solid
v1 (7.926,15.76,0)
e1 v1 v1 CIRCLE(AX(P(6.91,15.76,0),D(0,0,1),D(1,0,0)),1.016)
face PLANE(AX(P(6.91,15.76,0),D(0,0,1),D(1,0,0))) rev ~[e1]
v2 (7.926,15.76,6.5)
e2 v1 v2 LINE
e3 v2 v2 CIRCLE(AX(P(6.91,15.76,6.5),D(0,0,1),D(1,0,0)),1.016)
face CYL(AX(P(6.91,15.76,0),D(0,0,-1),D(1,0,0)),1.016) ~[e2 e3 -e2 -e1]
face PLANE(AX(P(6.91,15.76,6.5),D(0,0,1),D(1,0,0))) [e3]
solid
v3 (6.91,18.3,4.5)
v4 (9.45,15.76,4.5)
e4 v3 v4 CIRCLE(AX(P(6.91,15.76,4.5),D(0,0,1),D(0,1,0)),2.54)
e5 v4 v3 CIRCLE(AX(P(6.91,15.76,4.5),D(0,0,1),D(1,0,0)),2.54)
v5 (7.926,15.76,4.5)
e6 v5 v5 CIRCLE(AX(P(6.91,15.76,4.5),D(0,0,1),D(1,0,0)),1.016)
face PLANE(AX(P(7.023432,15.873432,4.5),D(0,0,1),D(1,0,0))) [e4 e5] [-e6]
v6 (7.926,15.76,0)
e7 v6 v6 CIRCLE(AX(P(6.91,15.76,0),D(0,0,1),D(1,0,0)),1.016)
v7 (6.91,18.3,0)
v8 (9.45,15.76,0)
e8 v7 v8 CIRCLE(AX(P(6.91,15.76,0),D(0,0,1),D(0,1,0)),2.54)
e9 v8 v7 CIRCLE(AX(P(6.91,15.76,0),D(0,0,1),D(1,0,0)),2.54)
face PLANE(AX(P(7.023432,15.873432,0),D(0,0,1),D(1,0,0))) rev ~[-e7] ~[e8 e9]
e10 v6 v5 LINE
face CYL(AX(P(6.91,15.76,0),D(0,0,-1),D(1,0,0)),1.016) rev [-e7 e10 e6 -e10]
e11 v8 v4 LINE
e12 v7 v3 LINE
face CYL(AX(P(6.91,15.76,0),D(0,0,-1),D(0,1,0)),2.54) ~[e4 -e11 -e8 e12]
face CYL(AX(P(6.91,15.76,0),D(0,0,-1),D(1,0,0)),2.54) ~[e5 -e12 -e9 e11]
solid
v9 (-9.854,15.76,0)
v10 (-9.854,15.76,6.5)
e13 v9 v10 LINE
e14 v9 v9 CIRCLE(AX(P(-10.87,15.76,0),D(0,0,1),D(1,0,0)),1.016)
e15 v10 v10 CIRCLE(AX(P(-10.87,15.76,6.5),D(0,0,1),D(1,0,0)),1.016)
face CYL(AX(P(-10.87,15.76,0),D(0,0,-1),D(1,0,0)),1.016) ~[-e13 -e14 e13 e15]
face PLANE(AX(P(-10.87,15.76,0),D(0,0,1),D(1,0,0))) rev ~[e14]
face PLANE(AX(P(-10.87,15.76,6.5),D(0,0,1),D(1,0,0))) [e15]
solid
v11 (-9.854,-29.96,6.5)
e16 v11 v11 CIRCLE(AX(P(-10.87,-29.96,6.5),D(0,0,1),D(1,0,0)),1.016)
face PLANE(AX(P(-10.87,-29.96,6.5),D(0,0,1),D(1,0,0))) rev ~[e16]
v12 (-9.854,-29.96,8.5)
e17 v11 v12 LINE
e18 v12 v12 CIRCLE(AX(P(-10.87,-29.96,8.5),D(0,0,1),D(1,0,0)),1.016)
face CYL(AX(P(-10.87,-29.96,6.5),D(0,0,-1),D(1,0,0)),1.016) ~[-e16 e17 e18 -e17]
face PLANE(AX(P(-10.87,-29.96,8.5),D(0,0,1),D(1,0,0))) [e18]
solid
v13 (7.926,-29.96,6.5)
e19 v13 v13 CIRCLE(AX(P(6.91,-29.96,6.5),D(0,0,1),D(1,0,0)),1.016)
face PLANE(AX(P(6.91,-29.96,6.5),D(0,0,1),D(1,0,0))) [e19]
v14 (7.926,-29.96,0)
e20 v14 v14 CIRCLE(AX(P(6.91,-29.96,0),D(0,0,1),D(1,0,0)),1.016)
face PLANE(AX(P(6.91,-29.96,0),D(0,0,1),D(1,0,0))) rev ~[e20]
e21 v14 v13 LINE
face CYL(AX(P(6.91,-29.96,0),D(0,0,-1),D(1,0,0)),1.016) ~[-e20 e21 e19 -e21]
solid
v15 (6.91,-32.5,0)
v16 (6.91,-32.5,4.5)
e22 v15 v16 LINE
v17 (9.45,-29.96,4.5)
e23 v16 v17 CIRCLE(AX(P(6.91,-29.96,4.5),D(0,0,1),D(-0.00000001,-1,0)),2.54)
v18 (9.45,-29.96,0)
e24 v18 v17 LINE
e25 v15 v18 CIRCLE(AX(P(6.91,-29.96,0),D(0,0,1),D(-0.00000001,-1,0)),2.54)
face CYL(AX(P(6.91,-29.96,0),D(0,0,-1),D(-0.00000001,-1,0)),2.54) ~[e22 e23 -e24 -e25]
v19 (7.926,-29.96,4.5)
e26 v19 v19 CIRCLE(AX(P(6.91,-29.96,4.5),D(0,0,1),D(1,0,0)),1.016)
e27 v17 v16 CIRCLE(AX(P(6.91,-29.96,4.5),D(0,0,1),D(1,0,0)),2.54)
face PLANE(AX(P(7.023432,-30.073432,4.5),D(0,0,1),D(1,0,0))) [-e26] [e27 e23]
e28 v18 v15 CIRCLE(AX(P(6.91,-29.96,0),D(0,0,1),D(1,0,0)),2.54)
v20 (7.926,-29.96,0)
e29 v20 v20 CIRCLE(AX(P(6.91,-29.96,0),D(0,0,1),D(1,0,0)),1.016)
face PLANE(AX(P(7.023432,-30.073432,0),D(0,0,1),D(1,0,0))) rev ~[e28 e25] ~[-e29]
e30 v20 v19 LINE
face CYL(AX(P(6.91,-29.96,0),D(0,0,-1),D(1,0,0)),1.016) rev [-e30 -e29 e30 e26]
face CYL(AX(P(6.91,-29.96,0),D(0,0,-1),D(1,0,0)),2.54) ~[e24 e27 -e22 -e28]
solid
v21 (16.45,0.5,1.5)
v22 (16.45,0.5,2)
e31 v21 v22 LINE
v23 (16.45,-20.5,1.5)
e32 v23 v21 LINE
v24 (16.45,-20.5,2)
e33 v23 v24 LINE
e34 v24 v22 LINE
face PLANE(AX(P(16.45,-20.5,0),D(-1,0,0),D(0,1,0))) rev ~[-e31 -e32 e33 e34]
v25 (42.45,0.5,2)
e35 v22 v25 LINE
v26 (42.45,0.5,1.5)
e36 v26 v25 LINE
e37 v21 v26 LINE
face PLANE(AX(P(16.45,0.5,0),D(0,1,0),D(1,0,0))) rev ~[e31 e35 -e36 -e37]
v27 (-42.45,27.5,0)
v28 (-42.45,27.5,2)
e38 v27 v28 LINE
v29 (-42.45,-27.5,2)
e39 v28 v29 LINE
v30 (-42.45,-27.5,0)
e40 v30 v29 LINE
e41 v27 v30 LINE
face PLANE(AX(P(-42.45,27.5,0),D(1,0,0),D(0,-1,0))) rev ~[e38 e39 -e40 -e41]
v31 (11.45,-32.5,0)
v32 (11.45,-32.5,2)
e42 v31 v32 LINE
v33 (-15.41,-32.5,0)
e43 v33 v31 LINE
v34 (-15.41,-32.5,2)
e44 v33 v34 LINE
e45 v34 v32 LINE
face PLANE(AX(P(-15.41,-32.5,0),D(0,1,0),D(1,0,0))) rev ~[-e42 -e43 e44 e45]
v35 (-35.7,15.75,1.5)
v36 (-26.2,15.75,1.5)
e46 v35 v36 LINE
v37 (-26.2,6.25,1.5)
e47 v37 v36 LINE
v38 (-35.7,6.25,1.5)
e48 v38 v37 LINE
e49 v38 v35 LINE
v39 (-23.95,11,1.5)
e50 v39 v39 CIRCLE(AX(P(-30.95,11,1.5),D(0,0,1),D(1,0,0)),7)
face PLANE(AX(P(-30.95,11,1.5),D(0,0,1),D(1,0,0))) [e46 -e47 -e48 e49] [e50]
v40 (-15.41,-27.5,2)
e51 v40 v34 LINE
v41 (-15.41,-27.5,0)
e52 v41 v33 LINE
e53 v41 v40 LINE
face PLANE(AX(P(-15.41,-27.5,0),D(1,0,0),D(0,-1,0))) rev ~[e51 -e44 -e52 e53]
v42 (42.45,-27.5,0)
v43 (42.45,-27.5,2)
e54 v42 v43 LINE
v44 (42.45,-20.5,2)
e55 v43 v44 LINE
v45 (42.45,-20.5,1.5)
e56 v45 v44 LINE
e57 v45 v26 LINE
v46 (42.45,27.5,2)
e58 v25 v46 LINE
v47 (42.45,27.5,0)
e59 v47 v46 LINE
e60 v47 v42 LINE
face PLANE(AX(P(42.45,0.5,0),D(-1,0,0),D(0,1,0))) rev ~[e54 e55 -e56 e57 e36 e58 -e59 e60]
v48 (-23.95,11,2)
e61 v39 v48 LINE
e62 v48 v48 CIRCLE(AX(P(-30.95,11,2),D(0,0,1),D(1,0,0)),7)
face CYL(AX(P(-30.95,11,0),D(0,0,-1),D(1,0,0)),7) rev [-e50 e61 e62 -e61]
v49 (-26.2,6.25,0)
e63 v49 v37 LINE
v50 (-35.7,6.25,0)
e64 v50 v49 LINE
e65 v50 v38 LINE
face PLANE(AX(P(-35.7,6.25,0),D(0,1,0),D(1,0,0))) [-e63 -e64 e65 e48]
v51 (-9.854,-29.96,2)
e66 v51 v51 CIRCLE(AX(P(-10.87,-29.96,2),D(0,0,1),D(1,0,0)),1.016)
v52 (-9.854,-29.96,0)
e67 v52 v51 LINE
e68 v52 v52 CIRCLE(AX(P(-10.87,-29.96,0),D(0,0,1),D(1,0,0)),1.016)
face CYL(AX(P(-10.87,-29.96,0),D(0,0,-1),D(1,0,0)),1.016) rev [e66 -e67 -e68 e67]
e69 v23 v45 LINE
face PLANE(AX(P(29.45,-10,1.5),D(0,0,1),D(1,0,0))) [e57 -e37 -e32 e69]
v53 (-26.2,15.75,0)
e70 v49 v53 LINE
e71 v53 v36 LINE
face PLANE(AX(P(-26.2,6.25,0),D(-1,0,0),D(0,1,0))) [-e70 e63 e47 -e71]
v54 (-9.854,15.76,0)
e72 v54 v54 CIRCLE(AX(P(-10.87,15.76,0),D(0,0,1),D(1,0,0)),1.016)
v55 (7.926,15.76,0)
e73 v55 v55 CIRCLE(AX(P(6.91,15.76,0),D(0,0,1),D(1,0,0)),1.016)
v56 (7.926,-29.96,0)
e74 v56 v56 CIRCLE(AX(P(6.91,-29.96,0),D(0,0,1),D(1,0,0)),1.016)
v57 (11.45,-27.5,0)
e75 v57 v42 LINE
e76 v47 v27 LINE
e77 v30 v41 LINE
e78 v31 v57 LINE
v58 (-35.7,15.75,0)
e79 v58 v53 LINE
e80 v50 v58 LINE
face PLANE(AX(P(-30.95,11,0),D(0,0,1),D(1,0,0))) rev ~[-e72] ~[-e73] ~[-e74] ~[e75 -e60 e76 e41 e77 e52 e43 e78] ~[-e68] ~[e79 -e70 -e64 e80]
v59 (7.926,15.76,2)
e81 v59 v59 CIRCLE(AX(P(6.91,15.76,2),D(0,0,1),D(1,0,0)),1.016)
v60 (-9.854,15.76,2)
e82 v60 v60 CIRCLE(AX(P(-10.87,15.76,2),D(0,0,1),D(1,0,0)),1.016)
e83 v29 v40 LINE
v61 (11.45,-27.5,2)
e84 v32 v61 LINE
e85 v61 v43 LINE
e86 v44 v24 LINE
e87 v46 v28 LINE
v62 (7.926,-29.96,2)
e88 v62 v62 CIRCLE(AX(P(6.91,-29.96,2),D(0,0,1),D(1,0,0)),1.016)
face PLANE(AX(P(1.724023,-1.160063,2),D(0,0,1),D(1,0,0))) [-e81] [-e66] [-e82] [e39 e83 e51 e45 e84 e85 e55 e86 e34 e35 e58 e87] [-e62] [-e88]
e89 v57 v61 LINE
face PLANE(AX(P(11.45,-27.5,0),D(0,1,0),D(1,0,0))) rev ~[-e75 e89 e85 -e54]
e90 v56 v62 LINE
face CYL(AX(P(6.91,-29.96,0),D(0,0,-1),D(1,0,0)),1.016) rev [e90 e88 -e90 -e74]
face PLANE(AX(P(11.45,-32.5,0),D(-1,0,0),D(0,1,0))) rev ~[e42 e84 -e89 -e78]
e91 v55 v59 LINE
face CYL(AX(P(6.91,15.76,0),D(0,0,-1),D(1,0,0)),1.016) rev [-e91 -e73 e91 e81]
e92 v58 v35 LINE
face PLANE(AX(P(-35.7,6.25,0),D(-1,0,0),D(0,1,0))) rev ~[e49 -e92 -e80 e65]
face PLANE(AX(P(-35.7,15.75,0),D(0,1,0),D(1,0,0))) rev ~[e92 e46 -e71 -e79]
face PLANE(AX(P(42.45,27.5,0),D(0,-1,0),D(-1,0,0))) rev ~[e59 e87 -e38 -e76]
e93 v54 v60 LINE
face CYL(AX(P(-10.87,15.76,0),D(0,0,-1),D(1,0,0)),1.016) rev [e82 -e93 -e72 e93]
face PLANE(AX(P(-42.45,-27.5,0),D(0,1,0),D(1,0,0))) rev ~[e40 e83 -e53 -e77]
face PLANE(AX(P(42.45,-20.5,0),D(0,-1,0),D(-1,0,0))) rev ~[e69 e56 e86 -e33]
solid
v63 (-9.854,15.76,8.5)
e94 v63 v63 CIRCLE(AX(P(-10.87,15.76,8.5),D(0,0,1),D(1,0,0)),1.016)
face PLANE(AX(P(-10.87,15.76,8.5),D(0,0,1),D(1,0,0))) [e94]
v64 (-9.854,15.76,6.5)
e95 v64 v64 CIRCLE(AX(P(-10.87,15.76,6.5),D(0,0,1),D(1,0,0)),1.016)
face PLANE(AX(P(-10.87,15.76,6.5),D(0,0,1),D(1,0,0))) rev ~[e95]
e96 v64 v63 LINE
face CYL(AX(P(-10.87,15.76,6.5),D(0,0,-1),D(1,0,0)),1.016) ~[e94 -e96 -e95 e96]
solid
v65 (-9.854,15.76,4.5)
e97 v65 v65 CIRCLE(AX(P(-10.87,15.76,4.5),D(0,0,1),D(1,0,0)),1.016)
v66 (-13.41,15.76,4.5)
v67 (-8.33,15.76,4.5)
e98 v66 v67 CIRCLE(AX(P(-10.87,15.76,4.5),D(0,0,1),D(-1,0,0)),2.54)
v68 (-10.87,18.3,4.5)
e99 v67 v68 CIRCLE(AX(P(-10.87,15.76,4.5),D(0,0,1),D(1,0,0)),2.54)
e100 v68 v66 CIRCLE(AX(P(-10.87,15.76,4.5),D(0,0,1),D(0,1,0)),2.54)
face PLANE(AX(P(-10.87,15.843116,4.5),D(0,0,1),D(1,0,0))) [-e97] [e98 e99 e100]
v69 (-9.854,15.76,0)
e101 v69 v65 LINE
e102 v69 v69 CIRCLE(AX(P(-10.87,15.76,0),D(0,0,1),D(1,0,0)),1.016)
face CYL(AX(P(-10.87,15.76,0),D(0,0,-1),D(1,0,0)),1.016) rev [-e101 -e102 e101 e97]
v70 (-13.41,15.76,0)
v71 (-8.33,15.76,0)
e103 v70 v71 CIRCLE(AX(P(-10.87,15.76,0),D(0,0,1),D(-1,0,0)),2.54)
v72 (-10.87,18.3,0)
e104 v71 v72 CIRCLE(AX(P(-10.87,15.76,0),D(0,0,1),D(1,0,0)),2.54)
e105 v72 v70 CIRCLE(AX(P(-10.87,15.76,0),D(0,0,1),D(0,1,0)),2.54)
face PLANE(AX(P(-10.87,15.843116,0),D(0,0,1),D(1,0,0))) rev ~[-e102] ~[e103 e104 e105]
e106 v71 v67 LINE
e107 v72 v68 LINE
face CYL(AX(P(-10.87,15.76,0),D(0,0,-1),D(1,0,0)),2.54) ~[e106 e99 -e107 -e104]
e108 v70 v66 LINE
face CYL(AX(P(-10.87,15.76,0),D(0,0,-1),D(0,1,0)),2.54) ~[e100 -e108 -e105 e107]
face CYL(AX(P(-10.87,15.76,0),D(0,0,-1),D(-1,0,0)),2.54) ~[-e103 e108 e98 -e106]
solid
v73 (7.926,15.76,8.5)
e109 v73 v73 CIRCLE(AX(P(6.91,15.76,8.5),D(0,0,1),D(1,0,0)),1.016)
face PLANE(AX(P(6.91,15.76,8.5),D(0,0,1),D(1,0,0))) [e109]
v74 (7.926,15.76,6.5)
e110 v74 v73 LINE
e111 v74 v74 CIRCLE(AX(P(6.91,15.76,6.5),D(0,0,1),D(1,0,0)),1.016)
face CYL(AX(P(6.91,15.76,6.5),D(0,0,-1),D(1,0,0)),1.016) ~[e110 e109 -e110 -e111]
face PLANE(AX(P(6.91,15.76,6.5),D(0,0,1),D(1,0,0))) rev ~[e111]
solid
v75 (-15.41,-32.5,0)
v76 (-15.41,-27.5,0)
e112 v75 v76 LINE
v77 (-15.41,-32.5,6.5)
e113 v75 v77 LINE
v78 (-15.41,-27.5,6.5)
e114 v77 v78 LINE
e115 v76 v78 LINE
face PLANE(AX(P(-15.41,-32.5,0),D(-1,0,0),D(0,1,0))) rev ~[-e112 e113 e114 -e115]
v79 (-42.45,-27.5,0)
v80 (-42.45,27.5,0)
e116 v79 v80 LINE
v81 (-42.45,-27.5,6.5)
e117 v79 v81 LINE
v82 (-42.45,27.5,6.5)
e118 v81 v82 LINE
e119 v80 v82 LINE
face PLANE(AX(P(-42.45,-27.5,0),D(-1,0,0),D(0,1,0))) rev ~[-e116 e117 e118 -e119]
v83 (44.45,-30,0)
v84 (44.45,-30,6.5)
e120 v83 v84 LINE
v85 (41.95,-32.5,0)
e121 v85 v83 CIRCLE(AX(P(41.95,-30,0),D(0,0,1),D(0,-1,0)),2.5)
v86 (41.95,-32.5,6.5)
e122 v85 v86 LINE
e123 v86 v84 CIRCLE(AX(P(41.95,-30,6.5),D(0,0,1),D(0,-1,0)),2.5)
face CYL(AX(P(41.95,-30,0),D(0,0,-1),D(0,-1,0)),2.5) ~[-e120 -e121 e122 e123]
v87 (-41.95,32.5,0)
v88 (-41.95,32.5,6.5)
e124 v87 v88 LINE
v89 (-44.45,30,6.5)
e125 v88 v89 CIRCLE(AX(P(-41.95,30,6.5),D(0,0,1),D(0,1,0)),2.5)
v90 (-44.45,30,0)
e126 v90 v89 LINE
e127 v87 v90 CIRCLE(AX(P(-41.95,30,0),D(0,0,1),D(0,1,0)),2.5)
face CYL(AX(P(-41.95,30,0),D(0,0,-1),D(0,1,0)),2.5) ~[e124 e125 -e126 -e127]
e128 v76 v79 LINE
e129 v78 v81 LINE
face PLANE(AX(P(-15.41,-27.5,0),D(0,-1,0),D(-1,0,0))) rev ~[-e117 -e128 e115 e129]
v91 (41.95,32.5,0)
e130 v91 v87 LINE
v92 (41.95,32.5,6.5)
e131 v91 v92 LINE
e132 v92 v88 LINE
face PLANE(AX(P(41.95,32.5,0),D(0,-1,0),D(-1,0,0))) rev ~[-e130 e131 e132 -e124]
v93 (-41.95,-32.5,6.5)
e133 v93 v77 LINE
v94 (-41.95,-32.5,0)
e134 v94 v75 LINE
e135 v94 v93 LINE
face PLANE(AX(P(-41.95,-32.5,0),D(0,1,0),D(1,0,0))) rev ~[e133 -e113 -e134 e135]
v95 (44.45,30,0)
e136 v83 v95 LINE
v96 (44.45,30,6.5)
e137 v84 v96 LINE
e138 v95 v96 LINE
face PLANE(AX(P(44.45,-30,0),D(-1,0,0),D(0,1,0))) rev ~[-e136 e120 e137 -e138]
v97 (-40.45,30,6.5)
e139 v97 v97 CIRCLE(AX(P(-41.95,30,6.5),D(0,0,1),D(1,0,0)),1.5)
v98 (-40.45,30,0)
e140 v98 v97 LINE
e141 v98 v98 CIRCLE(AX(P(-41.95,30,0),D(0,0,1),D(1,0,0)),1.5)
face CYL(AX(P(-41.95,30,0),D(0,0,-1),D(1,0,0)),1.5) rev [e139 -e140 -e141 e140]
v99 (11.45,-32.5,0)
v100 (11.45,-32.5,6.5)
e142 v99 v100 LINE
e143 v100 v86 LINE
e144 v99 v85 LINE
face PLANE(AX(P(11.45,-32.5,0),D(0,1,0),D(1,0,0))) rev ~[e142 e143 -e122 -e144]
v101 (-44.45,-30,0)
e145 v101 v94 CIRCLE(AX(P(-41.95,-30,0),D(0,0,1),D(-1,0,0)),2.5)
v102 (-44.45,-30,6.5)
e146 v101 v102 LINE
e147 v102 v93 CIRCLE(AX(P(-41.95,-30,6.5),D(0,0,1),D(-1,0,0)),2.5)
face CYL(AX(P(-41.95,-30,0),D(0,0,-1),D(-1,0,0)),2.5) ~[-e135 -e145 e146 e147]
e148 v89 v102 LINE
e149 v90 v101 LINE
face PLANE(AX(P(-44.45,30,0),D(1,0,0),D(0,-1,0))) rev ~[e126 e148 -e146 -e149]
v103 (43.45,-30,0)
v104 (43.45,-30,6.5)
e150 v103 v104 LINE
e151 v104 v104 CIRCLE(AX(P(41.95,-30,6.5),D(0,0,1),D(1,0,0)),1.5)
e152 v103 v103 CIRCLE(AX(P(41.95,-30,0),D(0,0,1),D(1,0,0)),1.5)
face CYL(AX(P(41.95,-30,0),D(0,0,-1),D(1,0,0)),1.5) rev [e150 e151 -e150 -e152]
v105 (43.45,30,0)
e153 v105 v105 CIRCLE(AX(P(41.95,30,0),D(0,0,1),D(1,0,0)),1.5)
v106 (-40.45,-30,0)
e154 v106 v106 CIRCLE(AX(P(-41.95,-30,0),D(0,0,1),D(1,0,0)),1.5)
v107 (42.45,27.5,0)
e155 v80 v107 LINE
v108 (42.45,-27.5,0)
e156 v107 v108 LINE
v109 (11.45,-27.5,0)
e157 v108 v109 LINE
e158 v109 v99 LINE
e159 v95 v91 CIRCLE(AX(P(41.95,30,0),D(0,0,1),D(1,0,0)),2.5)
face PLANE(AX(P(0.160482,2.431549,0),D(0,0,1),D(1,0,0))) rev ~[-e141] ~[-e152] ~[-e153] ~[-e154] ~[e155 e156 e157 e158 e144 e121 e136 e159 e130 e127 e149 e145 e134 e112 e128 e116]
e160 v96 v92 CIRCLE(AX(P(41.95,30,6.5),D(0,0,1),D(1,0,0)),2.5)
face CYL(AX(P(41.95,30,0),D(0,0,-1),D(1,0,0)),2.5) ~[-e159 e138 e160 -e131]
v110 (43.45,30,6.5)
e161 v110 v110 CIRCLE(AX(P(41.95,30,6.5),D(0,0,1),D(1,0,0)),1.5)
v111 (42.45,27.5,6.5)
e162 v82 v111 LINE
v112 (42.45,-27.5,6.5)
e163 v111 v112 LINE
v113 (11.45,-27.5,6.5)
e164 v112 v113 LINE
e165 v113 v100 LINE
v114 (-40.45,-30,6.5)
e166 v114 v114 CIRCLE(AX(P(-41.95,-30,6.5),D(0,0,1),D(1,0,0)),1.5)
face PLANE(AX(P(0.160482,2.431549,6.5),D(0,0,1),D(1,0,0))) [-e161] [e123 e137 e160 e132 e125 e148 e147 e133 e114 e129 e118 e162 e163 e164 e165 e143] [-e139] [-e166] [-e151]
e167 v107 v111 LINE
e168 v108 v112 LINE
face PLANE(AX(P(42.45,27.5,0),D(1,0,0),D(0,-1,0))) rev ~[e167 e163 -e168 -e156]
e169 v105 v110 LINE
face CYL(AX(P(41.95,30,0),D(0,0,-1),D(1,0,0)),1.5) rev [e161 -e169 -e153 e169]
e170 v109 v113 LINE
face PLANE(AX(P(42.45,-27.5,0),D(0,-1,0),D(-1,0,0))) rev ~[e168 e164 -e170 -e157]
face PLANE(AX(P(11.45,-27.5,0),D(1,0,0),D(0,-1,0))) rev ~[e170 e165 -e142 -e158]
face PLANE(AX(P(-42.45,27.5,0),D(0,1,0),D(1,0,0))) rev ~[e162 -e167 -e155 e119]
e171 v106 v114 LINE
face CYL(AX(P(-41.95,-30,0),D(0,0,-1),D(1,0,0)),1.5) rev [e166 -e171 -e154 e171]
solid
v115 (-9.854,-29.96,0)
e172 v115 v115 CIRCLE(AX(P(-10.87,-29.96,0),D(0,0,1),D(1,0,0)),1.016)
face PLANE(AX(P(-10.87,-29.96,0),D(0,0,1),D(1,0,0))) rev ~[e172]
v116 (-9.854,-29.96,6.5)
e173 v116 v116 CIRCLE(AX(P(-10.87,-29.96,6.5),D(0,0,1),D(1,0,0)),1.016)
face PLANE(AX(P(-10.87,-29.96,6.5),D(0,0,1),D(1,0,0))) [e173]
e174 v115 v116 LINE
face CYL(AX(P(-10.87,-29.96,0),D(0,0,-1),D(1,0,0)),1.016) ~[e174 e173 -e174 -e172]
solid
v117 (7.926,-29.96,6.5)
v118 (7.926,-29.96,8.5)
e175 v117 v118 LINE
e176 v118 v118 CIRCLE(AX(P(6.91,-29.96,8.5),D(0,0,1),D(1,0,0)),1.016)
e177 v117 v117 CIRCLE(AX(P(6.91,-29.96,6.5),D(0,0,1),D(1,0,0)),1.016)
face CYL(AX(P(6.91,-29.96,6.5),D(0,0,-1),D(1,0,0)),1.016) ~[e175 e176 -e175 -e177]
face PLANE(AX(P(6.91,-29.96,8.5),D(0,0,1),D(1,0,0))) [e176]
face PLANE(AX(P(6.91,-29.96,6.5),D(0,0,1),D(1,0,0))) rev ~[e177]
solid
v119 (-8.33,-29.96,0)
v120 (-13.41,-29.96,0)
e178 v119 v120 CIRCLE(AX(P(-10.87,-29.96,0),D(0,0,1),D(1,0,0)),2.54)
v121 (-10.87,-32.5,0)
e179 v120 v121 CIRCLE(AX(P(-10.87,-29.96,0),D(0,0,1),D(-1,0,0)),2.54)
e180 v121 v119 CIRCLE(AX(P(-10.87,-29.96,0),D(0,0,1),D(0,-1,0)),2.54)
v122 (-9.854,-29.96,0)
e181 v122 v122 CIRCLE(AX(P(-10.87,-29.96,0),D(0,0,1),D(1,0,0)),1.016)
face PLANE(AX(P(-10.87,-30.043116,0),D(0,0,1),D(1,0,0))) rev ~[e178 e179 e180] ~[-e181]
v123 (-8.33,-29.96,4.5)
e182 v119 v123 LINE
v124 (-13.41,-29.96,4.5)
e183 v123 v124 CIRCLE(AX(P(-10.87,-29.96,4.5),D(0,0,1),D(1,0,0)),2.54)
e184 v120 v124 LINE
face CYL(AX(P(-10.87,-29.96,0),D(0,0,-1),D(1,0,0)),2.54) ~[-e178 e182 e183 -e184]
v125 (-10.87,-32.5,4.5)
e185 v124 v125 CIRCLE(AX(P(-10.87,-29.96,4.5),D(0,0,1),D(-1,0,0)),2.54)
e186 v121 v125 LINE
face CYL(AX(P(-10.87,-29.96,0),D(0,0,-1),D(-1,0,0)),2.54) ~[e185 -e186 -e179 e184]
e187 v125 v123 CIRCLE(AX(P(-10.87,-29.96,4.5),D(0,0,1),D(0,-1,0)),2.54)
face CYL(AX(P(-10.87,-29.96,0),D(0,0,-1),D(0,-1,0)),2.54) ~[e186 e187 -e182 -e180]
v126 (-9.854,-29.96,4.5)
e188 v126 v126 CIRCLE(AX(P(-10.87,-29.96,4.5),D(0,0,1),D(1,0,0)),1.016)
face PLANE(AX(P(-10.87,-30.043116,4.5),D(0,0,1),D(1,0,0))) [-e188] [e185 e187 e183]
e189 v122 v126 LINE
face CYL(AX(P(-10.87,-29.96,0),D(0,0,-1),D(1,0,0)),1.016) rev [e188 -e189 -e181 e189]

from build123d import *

# Parameters (mm, degrees)
F0_R      = 1.016
F1_DEPTH  = 6.5
F0_R_2    = 1.5
F0_R_3    = 7
F1_FACE_R = 1.016
F2_DEPTH  = 2
F0_W      = 9.5
F0_H      = 9.5
F0_W_2    = 26
F0_H_2    = 21
F3_DEPTH  = 1.5
F4_DEPTH  = 4.5


with BuildPart() as f1:
    # F0 (on Top) → F1 (new body)
    with BuildSketch(Plane.XY):
        with Locations((-10.87, -29.96)):
            Circle(F0_R)
    extrude(amount=F1_DEPTH)


with BuildPart() as f1b:
    # F0 (on Top) → F1, piece 2 (new body)
    with BuildSketch(Plane.XY):
        with Locations((6.91, -29.96)):
            Circle(F0_R)
    extrude(amount=F1_DEPTH)


with BuildPart() as f1c:
    # F0 (on Top) → F1, piece 3 (new body)
    with BuildSketch(Plane.XY):
        with Locations((-10.87, 15.76)):
            Circle(F0_R)
    extrude(amount=F1_DEPTH)


with BuildPart() as f1d:
    # F0 (on Top) → F1, piece 4 (new body)
    with BuildSketch(Plane.XY):
        with Locations((6.91, 15.76)):
            Circle(F0_R)
    extrude(amount=F1_DEPTH)


with BuildPart() as f1e:
    # F0 (on Top) → F1, piece 5 (new body)
    with BuildSketch(Plane.XY):
        with BuildLine():
            Line((-42.45, 27.5), (42.45, 27.5))
            Line((42.45, 27.5), (42.45, 0.5))
            Line((42.45, 0.5), (42.45, -20.5))
            Line((42.45, -20.5), (42.45, -27.5))
            Line((42.45, -27.5), (11.45, -27.5))
            Line((11.45, -27.5), (11.45, -32.5))
            Line((11.45, -32.5), (41.95, -32.5))
            ThreePointArc((41.95, -32.5), (43.717766953, -31.767766953), (44.45, -30))
            Line((44.45, -30), (44.45, -27.5))
            Line((44.45, -27.5), (44.45, 27.5))
            Line((44.45, 27.5), (44.45, 30))
            ThreePointArc((44.45, 30), (43.717766953, 31.767766953), (41.95, 32.5))
            Line((41.95, 32.5), (-41.95, 32.5))
            ThreePointArc((-41.95, 32.5), (-43.717766953, 31.767766953), (-44.45, 30))
            Line((-44.45, 30), (-44.45, 27.5))
            Line((-44.45, 27.5), (-44.45, -27.5))
            Line((-44.45, -27.5), (-44.45, -30))
            ThreePointArc((-44.45, -30), (-43.717766953, -31.767766953), (-41.95, -32.5))
            Line((-41.95, -32.5), (-15.41, -32.5))
            Line((-15.41, -32.5), (-15.41, -27.5))
            Line((-15.41, -27.5), (-42.45, -27.5))
            Line((-42.45, -27.5), (-42.45, 27.5))
        make_face()
        with Locations((-41.95, -30)):
            Circle(F0_R_2, mode=Mode.SUBTRACT)
        with Locations((41.95, -30)):
            Circle(F0_R_2, mode=Mode.SUBTRACT)
        with Locations((-41.95, 30)):
            Circle(F0_R_2, mode=Mode.SUBTRACT)
        with Locations((41.95, 30)):
            Circle(F0_R_2, mode=Mode.SUBTRACT)
    extrude(amount=F1_DEPTH)


with BuildPart() as f2:
    # F0 (on Top) + F1_face (on face) → F2 (new body)
    with BuildSketch(Plane.XY):
        Polygon((42.45, 0.5), (42.45, 27.5), (-42.45, 27.5), (-42.45, -27.5), (-15.41, -27.5), (-15.41, -32.5), (-13.41, -32.5), (-13.41, -29.96), (-13.41, 15.76), (-13.41, 18.3), (-10.87, 18.3), (6.9099999988, 18.3), (9.45, 18.3), (9.45, 15.76), (9.45, -29.96), (9.45, -32.5), (11.45, -32.5), (11.45, -27.5), (42.45, -27.5), (42.45, -20.5), (16.45, -20.5), (16.45, 0.5), align=None)
        with Locations((-30.95, 11)):
            Circle(F0_R_3, mode=Mode.SUBTRACT)
        with BuildLine():
            Line((-13.41, -29.96), (-13.41, -32.5))
            Line((-13.41, -32.5), (-10.87, -32.5))
            ThreePointArc((-10.87, -32.5), (-12.6660512242, -31.7560512242), (-13.41, -29.96))
        make_face()
        with BuildLine():
            ThreePointArc((-8.33, -29.96), (-9.0739487758, -31.7560512242), (-10.87, -32.5))
            Line((-10.87, -32.5), (6.9099999741, -32.5))
            ThreePointArc((6.9099999741, -32.5), (5.1139487849, -28.1639487666), (9.45, -29.96))
            Line((9.45, -29.96), (9.45, 15.76))
            ThreePointArc((9.45, 15.76), (5.1139487762, 13.9639487754), (6.9099999988, 18.3))
            Line((6.9099999988, 18.3), (-10.87, 18.3))
            ThreePointArc((-10.87, 18.3), (-9.0739487758, 17.5560512242), (-8.33, 15.76))
            ThreePointArc((-8.33, 15.76), (-10.87, 13.22), (-13.41, 15.76))
            Line((-13.41, 15.76), (-13.41, -29.96))
            ThreePointArc((-13.41, -29.96), (-10.87, -27.42), (-8.33, -29.96))
        make_face()
        with BuildLine():
            Line((6.9099999741, -32.5), (9.45, -32.5))
            Line((9.45, -32.5), (9.45, -29.96))
            ThreePointArc((9.45, -29.96), (8.7060512151, -31.7560512334), (6.9099999741, -32.5))
        make_face()
        with BuildLine():
            ThreePointArc((6.9099999988, 18.3), (8.7060512238, 17.5560512246), (9.45, 15.76))
            Line((9.45, 15.76), (9.45, 18.3))
            Line((9.45, 18.3), (6.9099999988, 18.3))
        make_face()
        with BuildLine():
            Line((-13.41, 18.3), (-13.41, 15.76))
            ThreePointArc((-13.41, 15.76), (-12.6660512242, 17.5560512242), (-10.87, 18.3))
            Line((-10.87, 18.3), (-13.41, 18.3))
        make_face()
        with BuildLine():
            ThreePointArc((6.9099999988, 18.3), (5.1139487762, 13.9639487754), (9.45, 15.76))
            ThreePointArc((9.45, 15.76), (8.7060512238, 17.5560512246), (6.9099999988, 18.3))
        make_face()
        with Locations((6.91, 15.76)):
            Circle(F0_R, mode=Mode.SUBTRACT)
        with BuildLine():
            ThreePointArc((-13.41, -29.96), (-12.6660512242, -31.7560512242), (-10.87, -32.5))
            ThreePointArc((-10.87, -32.5), (-9.0739487758, -31.7560512242), (-8.33, -29.96))
            ThreePointArc((-8.33, -29.96), (-10.87, -27.42), (-13.41, -29.96))
        make_face()
        with Locations((-10.87, -29.96)):
            Circle(F0_R, mode=Mode.SUBTRACT)
        with BuildLine():
            ThreePointArc((9.45, -29.96), (5.1139487849, -28.1639487666), (6.9099999741, -32.5))
            ThreePointArc((6.9099999741, -32.5), (8.7060512151, -31.7560512334), (9.45, -29.96))
        make_face()
        with Locations((6.91, -29.96)):
            Circle(F0_R, mode=Mode.SUBTRACT)
        with BuildLine():
            ThreePointArc((-10.87, 18.3), (-12.6660512242, 17.5560512242), (-13.41, 15.76))
            ThreePointArc((-13.41, 15.76), (-10.87, 13.22), (-8.33, 15.76))
            ThreePointArc((-8.33, 15.76), (-9.0739487758, 17.5560512242), (-10.87, 18.3))
        make_face()
        with Locations((-10.87, 15.76)):
            Circle(F0_R, mode=Mode.SUBTRACT)
    with BuildSketch(Plane(origin=(-10.87, -29.96, 6.5), x_dir=(1, 0, 0), z_dir=(0, 0, 1))):
        Circle(F1_FACE_R)
        with Locations((17.78, 0)):
            Circle(F1_FACE_R)
        with Locations((0, 45.72)):
            Circle(F1_FACE_R)
        with Locations((17.78, 45.72)):
            Circle(F1_FACE_R)
    extrude(amount=F2_DEPTH)

    # F0 (on Top) → F3 (join)
    with BuildSketch(Plane.XY):
        with Locations((-30.95, 11)):
            Circle(F0_R_3)
        with Locations((-30.95, 11)):
            Rectangle(F0_W, F0_H, mode=Mode.SUBTRACT)
        with Locations((29.45, -10)):
            Rectangle(F0_W_2, F0_H_2)
    extrude(amount=F3_DEPTH)


with BuildPart() as f4:
    # F0 (on Top) → F4 (new body)
    with BuildSketch(Plane.XY):
        with BuildLine():
            ThreePointArc((-10.87, 18.3), (-12.6660512242, 17.5560512242), (-13.41, 15.76))
            ThreePointArc((-13.41, 15.76), (-10.87, 13.22), (-8.33, 15.76))
            ThreePointArc((-8.33, 15.76), (-9.0739487758, 17.5560512242), (-10.87, 18.3))
        make_face()
        with Locations((-10.87, 15.76)):
            Circle(F0_R, mode=Mode.SUBTRACT)
    extrude(amount=F4_DEPTH)


with BuildPart() as f4b:
    # F0 (on Top) → F4, piece 2 (new body)
    with BuildSketch(Plane.XY):
        with BuildLine():
            ThreePointArc((6.9099999988, 18.3), (5.1139487762, 13.9639487754), (9.45, 15.76))
            ThreePointArc((9.45, 15.76), (8.7060512238, 17.5560512246), (6.9099999988, 18.3))
        make_face()
        with Locations((6.91, 15.76)):
            Circle(F0_R, mode=Mode.SUBTRACT)
    extrude(amount=F4_DEPTH)


with BuildPart() as f4c:
    # F0 (on Top) → F4, piece 3 (new body)
    with BuildSketch(Plane.XY):
        with BuildLine():
            ThreePointArc((9.45, -29.96), (5.1139487849, -28.1639487666), (6.9099999741, -32.5))
            ThreePointArc((6.9099999741, -32.5), (8.7060512151, -31.7560512334), (9.45, -29.96))
        make_face()
        with Locations((6.91, -29.96)):
            Circle(F0_R, mode=Mode.SUBTRACT)
    extrude(amount=F4_DEPTH)


with BuildPart() as f4d:
    # F0 (on Top) → F4, piece 4 (new body)
    with BuildSketch(Plane.XY):
        with BuildLine():
            ThreePointArc((-13.41, -29.96), (-12.6660512242, -31.7560512242), (-10.87, -32.5))
            ThreePointArc((-10.87, -32.5), (-9.0739487758, -31.7560512242), (-8.33, -29.96))
            ThreePointArc((-8.33, -29.96), (-10.87, -27.42), (-13.41, -29.96))
        make_face()
        with Locations((-10.87, -29.96)):
            Circle(F0_R, mode=Mode.SUBTRACT)
    extrude(amount=F4_DEPTH)


solid = Compound([f1.part, f1b.part, f1c.part, f1d.part, f1e.part, f2.part, f4.part, f4b.part, f4c.part, f4d.part])
